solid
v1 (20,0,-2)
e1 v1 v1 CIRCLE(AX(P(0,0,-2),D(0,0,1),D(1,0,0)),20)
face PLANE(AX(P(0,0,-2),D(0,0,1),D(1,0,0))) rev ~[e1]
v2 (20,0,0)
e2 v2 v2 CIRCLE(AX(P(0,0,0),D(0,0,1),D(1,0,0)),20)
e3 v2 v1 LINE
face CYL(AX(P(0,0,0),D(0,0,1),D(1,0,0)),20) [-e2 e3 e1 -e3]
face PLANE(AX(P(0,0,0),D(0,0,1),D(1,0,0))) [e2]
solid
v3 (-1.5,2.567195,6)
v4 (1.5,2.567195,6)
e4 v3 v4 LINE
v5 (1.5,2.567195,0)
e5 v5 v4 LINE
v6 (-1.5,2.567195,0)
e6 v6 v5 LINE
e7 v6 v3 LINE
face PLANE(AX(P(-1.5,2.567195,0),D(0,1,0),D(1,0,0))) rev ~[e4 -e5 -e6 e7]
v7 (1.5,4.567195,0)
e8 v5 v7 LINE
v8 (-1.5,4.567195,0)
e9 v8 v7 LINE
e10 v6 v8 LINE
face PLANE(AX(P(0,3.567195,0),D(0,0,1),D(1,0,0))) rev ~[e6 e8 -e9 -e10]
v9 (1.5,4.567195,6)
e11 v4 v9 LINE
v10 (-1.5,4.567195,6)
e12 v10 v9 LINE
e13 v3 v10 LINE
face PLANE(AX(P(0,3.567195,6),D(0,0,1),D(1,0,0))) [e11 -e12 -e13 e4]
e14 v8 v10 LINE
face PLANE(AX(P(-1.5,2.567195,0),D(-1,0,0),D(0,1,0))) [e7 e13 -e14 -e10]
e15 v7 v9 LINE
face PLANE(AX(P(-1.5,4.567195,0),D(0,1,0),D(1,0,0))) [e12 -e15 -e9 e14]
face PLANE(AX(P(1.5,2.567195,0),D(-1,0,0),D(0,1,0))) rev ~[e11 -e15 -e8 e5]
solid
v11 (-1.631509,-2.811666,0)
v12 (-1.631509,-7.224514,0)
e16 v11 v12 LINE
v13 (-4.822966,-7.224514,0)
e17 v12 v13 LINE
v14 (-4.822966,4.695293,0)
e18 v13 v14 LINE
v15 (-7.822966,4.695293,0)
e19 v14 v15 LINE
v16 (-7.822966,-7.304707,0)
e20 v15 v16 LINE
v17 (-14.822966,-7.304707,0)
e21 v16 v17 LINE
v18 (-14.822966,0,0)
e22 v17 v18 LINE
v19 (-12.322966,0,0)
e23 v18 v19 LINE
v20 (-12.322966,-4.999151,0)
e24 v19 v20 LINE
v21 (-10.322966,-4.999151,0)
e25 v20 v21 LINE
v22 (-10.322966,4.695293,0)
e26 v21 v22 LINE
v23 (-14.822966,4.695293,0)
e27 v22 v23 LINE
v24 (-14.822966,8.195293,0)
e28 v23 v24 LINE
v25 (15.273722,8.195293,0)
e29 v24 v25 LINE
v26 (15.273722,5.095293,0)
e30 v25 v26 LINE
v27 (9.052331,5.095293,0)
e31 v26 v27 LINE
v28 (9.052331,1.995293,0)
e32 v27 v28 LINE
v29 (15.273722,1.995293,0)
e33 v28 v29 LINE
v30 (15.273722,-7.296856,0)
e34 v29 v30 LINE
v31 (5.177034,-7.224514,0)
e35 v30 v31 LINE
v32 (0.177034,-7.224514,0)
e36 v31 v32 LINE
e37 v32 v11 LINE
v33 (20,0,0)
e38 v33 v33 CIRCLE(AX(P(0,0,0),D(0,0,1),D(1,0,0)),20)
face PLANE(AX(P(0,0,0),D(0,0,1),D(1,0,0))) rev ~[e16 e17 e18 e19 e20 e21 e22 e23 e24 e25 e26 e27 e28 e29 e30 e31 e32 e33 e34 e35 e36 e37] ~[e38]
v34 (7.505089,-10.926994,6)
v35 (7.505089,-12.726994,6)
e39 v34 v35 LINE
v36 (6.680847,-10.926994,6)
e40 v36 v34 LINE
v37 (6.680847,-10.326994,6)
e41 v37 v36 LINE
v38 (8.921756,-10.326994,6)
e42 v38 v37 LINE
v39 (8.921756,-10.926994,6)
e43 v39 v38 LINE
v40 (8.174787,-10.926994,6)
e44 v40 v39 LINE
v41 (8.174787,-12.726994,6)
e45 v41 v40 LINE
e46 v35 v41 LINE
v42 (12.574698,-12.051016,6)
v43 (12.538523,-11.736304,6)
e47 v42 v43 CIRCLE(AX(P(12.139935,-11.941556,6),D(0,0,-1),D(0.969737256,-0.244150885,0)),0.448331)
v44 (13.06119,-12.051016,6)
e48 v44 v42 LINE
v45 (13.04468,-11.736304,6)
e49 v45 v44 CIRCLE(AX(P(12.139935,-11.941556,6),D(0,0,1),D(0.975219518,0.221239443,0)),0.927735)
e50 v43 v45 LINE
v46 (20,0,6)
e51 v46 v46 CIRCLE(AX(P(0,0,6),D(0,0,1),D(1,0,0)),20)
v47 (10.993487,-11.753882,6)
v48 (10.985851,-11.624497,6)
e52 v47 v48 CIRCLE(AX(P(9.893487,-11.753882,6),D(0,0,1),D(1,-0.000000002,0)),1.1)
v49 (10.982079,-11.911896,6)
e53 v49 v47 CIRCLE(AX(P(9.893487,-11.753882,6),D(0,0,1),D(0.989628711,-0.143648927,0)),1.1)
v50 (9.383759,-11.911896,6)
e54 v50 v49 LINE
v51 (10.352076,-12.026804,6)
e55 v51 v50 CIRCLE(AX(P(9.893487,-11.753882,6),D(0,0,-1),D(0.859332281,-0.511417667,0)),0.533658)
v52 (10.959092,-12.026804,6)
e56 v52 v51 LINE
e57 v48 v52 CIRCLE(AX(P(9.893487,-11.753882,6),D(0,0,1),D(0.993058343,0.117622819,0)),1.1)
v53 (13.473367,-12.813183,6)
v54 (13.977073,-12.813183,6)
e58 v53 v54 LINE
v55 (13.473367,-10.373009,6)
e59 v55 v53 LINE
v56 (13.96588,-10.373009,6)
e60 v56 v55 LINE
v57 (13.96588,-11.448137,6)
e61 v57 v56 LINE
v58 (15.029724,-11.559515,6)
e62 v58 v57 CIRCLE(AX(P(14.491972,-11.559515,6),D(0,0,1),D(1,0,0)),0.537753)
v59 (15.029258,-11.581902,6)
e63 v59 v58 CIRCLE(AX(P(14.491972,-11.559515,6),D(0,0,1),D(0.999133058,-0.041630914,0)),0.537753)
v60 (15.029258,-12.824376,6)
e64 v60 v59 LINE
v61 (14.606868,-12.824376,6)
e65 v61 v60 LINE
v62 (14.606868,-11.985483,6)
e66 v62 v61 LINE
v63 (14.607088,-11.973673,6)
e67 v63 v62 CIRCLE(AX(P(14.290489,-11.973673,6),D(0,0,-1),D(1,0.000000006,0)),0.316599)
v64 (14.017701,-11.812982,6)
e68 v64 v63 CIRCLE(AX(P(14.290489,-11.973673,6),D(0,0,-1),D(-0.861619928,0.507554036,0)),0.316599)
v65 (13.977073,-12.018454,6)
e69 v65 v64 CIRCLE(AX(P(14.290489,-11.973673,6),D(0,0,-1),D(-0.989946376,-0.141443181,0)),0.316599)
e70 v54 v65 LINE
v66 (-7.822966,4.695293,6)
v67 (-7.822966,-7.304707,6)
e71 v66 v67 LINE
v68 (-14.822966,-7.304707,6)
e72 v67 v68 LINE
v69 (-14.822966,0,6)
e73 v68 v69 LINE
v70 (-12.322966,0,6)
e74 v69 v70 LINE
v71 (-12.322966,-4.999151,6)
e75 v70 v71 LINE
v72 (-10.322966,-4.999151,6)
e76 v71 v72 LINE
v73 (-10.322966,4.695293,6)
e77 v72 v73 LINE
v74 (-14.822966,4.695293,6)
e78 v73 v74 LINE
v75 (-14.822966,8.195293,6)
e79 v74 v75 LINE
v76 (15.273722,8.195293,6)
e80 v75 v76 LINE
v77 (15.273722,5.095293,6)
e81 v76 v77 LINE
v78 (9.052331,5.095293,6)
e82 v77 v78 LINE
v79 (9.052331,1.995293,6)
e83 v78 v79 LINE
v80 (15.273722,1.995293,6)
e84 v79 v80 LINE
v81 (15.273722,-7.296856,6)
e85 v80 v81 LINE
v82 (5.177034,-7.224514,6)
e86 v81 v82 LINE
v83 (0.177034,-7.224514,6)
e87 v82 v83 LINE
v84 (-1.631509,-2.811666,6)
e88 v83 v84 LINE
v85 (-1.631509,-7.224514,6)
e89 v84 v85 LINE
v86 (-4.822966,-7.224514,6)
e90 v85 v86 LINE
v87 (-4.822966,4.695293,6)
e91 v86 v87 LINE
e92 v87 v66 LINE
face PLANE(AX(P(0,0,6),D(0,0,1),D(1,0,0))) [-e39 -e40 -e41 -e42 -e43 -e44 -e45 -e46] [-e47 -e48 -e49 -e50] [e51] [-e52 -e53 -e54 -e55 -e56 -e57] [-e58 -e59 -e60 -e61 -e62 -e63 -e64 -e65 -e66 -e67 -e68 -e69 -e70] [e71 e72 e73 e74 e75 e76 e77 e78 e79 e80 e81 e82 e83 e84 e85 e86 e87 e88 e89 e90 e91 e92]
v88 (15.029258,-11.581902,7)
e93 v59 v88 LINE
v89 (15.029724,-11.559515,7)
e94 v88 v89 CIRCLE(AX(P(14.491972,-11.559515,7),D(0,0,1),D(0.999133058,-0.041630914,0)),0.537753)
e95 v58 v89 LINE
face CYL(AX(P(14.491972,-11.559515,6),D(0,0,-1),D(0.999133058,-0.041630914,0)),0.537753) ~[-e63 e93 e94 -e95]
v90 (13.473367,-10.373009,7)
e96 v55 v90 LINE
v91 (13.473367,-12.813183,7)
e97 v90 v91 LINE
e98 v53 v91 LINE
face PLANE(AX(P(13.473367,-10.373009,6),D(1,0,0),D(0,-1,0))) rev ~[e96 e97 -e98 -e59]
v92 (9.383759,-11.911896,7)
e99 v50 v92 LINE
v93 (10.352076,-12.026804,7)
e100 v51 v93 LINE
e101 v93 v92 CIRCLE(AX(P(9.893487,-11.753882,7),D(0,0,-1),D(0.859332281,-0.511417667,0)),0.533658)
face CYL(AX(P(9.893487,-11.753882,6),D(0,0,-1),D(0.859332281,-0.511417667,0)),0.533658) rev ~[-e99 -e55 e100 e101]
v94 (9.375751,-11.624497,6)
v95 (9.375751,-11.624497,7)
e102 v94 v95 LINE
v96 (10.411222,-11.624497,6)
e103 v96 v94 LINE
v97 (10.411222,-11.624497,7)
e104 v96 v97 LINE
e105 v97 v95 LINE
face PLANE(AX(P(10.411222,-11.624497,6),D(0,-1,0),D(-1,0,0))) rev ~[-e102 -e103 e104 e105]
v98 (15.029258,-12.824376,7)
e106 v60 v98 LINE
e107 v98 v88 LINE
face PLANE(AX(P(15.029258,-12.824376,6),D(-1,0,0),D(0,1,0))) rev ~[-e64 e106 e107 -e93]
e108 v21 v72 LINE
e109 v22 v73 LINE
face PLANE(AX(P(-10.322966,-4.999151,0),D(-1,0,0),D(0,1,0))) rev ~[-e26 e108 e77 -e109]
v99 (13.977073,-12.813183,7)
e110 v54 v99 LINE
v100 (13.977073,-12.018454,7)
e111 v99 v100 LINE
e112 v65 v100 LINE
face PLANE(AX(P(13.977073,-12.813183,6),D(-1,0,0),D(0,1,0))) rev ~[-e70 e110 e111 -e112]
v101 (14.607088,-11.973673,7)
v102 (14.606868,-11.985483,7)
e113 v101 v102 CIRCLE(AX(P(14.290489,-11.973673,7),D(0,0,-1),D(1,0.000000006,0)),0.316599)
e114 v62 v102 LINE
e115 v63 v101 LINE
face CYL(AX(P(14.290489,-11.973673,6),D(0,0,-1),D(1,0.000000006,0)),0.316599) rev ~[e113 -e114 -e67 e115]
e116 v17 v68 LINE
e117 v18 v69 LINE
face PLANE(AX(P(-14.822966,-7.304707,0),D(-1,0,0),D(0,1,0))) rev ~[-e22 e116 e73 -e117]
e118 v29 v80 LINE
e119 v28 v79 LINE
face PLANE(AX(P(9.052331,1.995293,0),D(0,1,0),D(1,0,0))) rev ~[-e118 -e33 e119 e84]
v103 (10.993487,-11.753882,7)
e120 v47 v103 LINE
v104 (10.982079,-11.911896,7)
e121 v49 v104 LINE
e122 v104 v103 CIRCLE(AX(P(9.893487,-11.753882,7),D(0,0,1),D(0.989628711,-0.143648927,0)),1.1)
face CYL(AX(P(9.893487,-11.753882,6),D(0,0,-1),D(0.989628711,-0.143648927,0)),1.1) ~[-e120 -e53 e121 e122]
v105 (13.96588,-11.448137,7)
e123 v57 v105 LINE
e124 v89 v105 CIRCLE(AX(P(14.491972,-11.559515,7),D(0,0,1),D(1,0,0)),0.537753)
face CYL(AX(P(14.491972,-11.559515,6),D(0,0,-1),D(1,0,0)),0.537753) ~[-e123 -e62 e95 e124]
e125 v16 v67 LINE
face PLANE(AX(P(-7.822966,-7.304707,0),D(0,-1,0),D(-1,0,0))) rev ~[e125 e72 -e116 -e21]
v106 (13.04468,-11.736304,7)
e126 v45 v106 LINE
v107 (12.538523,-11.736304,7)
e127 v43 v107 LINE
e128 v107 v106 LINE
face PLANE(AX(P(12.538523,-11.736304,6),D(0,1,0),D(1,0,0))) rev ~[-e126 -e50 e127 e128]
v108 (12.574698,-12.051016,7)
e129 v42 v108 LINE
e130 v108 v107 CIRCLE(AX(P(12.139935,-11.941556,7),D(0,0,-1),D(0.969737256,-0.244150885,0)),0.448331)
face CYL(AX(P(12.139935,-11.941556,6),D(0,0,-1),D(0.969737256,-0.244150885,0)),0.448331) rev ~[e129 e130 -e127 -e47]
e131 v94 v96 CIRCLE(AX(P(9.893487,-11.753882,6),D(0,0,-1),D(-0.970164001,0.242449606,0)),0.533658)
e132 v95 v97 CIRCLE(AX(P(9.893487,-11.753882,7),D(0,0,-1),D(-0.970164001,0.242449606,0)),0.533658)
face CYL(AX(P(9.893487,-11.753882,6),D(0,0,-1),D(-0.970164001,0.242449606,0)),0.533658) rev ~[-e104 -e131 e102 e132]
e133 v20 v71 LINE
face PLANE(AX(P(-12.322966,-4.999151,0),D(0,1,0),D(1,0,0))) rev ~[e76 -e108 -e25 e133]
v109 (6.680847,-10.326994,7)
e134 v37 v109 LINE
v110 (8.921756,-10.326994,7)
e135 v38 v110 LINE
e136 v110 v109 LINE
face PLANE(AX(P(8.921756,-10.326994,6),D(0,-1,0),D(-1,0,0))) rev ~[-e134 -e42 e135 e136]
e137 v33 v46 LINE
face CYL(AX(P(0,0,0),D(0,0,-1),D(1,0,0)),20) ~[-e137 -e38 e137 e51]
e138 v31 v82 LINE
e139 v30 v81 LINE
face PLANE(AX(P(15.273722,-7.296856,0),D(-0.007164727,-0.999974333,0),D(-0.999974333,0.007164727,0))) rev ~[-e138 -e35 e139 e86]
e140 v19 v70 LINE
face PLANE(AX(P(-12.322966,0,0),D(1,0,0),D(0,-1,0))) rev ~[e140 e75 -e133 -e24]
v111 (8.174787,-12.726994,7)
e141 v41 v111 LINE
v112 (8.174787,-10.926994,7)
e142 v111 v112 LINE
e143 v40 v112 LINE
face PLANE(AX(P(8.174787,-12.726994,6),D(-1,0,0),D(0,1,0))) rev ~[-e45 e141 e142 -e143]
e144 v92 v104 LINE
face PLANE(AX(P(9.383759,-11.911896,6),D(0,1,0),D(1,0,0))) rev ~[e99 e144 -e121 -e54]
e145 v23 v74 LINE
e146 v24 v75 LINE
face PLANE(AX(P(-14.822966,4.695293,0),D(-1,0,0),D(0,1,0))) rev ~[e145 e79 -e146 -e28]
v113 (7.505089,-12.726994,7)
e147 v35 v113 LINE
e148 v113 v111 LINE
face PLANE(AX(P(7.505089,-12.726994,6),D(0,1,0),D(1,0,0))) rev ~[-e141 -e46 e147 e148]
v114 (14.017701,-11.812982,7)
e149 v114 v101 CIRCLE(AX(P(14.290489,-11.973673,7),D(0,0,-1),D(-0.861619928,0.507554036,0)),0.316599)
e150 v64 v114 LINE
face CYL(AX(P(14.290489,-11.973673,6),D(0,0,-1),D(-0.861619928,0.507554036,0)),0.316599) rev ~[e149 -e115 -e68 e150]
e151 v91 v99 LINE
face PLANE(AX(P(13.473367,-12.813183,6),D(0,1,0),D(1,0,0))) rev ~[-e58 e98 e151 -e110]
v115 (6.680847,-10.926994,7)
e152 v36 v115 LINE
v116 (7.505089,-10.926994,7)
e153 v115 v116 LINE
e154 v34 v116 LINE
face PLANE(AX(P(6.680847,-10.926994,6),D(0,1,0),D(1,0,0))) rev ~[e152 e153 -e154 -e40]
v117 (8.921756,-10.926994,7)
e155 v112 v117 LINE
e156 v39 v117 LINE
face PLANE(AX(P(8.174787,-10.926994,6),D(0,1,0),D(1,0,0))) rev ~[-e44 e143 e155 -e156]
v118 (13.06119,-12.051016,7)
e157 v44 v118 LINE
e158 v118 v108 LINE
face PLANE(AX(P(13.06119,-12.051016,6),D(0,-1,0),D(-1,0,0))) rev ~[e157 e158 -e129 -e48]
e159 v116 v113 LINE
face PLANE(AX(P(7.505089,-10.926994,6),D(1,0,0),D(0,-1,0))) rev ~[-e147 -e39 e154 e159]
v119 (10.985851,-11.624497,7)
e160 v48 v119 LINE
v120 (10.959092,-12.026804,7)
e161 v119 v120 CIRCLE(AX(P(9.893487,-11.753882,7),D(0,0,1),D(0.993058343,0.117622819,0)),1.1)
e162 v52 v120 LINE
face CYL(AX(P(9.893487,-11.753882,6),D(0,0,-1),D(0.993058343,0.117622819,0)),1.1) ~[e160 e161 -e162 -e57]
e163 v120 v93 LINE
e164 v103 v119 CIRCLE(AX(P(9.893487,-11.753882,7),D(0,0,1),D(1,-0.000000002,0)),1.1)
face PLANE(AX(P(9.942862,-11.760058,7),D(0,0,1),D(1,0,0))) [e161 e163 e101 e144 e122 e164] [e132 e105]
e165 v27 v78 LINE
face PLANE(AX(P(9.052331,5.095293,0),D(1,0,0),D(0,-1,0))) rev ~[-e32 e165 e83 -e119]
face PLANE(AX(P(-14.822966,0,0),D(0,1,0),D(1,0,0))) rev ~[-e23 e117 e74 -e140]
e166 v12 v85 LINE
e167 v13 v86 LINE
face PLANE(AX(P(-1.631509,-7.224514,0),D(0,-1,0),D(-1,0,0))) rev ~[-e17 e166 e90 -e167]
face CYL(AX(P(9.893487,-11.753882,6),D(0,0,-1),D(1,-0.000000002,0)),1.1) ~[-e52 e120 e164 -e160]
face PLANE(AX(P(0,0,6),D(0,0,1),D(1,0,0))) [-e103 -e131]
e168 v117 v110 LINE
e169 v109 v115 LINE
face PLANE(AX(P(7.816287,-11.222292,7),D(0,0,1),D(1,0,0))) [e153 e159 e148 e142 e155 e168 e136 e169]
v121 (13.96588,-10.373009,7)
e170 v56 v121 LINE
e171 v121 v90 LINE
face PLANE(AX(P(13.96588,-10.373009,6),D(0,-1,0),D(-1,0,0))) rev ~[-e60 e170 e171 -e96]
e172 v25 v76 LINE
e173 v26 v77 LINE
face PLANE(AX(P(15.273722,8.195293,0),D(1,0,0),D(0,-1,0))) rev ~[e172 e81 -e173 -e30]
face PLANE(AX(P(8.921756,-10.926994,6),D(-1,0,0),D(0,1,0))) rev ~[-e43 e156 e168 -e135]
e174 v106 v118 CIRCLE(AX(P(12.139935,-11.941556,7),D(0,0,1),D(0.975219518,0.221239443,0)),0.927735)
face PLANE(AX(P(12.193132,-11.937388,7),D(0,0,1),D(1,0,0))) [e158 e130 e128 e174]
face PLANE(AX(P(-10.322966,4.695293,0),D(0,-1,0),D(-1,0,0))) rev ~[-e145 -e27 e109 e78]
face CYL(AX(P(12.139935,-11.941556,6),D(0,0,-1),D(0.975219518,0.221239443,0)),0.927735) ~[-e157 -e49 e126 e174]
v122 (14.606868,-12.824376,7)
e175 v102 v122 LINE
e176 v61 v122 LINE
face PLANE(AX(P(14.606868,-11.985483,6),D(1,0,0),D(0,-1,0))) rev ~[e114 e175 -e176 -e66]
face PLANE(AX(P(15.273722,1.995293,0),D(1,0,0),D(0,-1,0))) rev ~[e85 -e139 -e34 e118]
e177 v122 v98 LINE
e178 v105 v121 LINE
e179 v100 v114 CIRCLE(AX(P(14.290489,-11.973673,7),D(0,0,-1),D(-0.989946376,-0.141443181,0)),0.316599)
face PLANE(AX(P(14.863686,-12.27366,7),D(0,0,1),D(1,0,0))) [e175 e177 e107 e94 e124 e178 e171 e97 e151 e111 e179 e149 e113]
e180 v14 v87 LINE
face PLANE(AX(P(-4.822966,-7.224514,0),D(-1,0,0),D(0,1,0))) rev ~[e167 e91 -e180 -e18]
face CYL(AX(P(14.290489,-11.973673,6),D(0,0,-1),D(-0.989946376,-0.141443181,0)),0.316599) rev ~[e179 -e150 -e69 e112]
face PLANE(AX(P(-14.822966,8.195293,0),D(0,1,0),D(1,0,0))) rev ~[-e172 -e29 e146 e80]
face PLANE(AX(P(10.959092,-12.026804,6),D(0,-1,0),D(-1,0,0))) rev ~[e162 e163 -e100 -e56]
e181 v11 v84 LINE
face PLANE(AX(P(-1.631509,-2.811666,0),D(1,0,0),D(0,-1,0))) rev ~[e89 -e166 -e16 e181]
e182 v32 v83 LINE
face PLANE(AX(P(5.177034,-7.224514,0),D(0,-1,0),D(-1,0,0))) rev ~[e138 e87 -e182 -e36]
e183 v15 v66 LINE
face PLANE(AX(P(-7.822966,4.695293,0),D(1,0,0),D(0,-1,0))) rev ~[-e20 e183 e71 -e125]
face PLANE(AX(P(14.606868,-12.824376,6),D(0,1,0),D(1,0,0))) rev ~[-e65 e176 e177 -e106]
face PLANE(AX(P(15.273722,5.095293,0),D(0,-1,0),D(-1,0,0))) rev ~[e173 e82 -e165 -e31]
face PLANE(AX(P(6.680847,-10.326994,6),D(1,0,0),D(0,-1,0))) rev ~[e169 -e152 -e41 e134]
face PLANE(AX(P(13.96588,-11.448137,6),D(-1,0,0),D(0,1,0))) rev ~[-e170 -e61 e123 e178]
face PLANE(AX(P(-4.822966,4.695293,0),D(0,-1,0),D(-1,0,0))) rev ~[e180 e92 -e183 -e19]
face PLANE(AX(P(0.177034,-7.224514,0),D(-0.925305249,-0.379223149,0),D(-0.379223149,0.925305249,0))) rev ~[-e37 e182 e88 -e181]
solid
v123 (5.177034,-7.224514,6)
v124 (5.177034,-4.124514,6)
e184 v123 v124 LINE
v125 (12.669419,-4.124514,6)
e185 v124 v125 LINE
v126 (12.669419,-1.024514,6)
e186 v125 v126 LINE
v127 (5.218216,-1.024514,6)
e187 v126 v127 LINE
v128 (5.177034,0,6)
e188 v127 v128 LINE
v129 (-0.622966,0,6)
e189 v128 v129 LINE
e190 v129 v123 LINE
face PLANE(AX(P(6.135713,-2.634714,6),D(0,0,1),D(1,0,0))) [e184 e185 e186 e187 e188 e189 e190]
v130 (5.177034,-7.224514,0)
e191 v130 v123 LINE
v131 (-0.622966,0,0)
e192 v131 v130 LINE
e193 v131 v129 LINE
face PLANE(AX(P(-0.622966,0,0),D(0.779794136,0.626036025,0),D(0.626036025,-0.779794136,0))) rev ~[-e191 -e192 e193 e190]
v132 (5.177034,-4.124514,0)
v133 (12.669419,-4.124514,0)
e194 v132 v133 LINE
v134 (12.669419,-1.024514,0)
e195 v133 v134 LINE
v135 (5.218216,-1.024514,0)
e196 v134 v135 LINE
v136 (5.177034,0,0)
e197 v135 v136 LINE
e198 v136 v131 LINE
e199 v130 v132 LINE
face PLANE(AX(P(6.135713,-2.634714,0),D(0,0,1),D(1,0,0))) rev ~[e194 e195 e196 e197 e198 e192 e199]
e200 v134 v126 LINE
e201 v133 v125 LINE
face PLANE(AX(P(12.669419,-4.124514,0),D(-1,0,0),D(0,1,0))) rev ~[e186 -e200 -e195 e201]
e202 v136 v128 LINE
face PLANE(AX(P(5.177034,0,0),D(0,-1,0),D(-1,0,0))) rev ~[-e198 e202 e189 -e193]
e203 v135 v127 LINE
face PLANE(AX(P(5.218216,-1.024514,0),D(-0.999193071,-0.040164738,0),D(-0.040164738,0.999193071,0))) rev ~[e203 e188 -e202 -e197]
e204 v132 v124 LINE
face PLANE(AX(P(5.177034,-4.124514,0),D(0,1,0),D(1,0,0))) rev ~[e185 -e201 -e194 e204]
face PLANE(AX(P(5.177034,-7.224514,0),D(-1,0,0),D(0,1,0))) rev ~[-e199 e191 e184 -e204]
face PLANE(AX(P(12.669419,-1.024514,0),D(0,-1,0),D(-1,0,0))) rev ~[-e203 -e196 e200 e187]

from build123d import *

# Parameters (mm, degrees)
F0_R     = 20
F1_DEPTH = 6
F0_W     = 3
F0_H     = 2
F2_DEPTH = 6
F3_DEPTH = 6
F6_R     = 20
F7_DEPTH = 2
F9_DEPTH = 1


# Not quite as in the source:
# - the program builds the solid bodies; features that only make, move or delete a surface that nothing else refers to are left out


with BuildPart() as f1:
    # F0 (on Top) → F1 (new body)
    with BuildSketch(Plane.XY):
        Circle(F0_R)
        Polygon((-14.8229663414, 4.6952926321), (-14.8229663414, 8.1952926321), (-4.8229663414, 8.1952926321), (5.1770336586, 8.1952926321), (15.2737221277, 8.1952926321), (15.2737221277, 5.0952926321), (9.0523306343, 5.0952926321), (9.0523306343, 1.9952926321), (15.2737221277, 1.9952926321), (15.2737221277, -7.2968558197), (5.1770336586, -7.2245139418), (0.1770336586, -7.2245139418), (-1.6315090997, -2.8116659632), (-1.6315090997, -7.2245139418), (-4.8229663414, -7.2245139418), (-4.8229663414, 4.6952926321), (-7.8229663414, 4.6952926321), (-7.8229663414, -7.3047073679), (-14.8229663414, -7.3047073679), (-14.8229663414, 0), (-12.3229663414, 0), (-12.3229663414, -4.9991512411), (-10.3229663414, -4.9991512411), (-10.3229663414, 4.6952926321), align=None, mode=Mode.SUBTRACT)
    extrude(amount=F1_DEPTH)

    # F8 (on face) → F9 (join)
    with BuildSketch(Plane.XY.offset(6)):
        with BuildLine():
            Line((15.0292580947, -12.8243761654), (15.0292580947, -11.5819023922))
            ThreePointArc((15.0292580947, -11.5819023922), (14.9037661569, -11.9053522282), (14.6068680189, -12.0848501905))
            Line((14.6068680189, -12.0848501905), (14.6068680189, -12.8243761654))
            Line((14.6068680189, -12.8243761654), (15.0292580947, -12.8243761654))
        make_face()
        with BuildLine():
            ThreePointArc((15.0297242951, -11.5595152602), (14.5479652061, -11.0246856664), (13.965879567, -11.4481367533))
            ThreePointArc((13.965879567, -11.4481367533), (13.9595626035, -11.63513708), (14.0177011696, -11.8129823311))
            ThreePointArc((14.0177011696, -11.8129823311), (14.373767478, -11.6682234447), (14.6070883482, -11.9736734778))
            ThreePointArc((14.6070883482, -11.9736734778), (14.6070332611, -11.9795792393), (14.6068680189, -11.9854829456))
            Line((14.6068680189, -11.9854829456), (14.6068680189, -12.0848501905))
            ThreePointArc((14.6068680189, -12.0848501905), (14.9037661569, -11.9053522282), (15.0292580947, -11.5819023922))
            ThreePointArc((15.0292580947, -11.5819023922), (15.0296077324, -11.570711253), (15.0297242951, -11.5595152602))
        make_face()
        with BuildLine():
            Line((13.965879567, -10.3730093688), (13.4733673185, -10.3730093688))
            Line((13.4733673185, -10.3730093688), (13.4733673185, -12.8131825477))
            Line((13.4733673185, -12.8131825477), (13.977073133, -12.8131825477))
            Line((13.977073133, -12.8131825477), (13.977073133, -12.0184542606))
            ThreePointArc((13.977073133, -12.0184542606), (13.9799034833, -11.912261244), (14.0177011696, -11.8129823311))
            ThreePointArc((14.0177011696, -11.8129823311), (13.9595626035, -11.63513708), (13.965879567, -11.4481367533))
            Line((13.965879567, -11.4481367533), (13.965879567, -10.3730093688))
        make_face()
        with BuildLine():
            Line((12.5385226393, -11.7363042429), (13.0446804071, -11.7363042429))
            ThreePointArc((13.0446804071, -11.7363042429), (11.2134738953, -11.990157639), (13.0611900744, -12.0510161396))
            Line((13.0611900744, -12.0510161396), (12.5746978874, -12.0510161396))
            ThreePointArc((12.5746978874, -12.0510161396), (11.6945373163, -11.992753054), (12.5385226393, -11.7363042429))
        make_face()
        with BuildLine():
            Line((10.4112224445, -11.6244971905), (10.9858511253, -11.6244971905))
            ThreePointArc((10.9858511253, -11.6244971905), (8.7959122239, -11.6808773259), (10.9590917495, -12.0268042712))
            Line((10.9590917495, -12.0268042712), (10.352076243, -12.0268042712))
            ThreePointArc((10.352076243, -12.0268042712), (9.8306001316, -12.2838217189), (9.3837593923, -11.9118961121))
            ThreePointArc((9.3837593923, -11.9118961121), (9.3600362793, -11.7687460957), (9.3757514516, -11.6244971905))
            ThreePointArc((9.3757514516, -11.6244971905), (9.893486948, -11.2202245839), (10.4112224445, -11.6244971905))
        make_face()
        with BuildLine():
            ThreePointArc((10.9820785301, -11.9118961121), (10.9906311364, -11.8330948527), (10.993486948, -11.7538822913))
            ThreePointArc((10.993486948, -11.7538822913), (10.9915763331, -11.6890771794), (10.9858511253, -11.6244971905))
            Line((10.9858511253, -11.6244971905), (10.4112224445, -11.6244971905))
            ThreePointArc((10.4112224445, -11.6244971905), (10.4231491454, -11.6887017322), (10.4271446554, -11.7538822913))
            ThreePointArc((10.4271446554, -11.7538822913), (10.4211282028, -11.8337900814), (10.4032145037, -11.9118961121))
            Line((10.4032145037, -11.9118961121), (10.9820785301, -11.9118961121))
        make_face()
        with BuildLine():
            ThreePointArc((10.4271446554, -11.7538822913), (10.4231491454, -11.6887017322), (10.4112224445, -11.6244971905))
            Line((10.4112224445, -11.6244971905), (9.3757514516, -11.6244971905))
            ThreePointArc((9.3757514516, -11.6244971905), (9.3600362793, -11.7687460957), (9.3837593923, -11.9118961121))
            Line((9.3837593923, -11.9118961121), (10.4032145037, -11.9118961121))
            ThreePointArc((10.4032145037, -11.9118961121), (10.4211282028, -11.8337900814), (10.4271446554, -11.7538822913))
        make_face()
        Polygon((8.9217557242, -10.3269937025), (6.6808465031, -10.3269937025), (6.6808465031, -10.9269937025), (7.5050893758, -10.9269937025), (7.5050893758, -12.7269937025), (8.1747866203, -12.7269937025), (8.1747866203, -10.9269937025), (8.9217557242, -10.9269937025), align=None)
    extrude(amount=F9_DEPTH)


with BuildPart() as f2:
    # F0 (on Top) → F2 (new body)
    with BuildSketch(Plane.XY):
        with Locations((0, 3.5671954031)):
            Rectangle(F0_W, F0_H)
    extrude(amount=F2_DEPTH)


with BuildPart() as f3:
    # F0 (on Top) → F3 (new body)
    with BuildSketch(Plane.XY):
        Polygon((5.2182162243, -1.0245139418), (5.1770336586, 0), (-0.6229663414, 0), (5.1770336586, -7.2245139418), (5.1770336586, -4.1245139418), (12.6694194104, -4.1245139418), (12.6694194104, -1.0245139418), align=None)
    extrude(amount=F3_DEPTH)


with BuildPart() as f7:
    # F6 (on face) → F7 (new body)
    with BuildSketch(Plane.XY):
        Circle(F6_R)
    extrude(amount=-F7_DEPTH)


solid = Compound([f1.part, f2.part, f3.part, f7.part])
